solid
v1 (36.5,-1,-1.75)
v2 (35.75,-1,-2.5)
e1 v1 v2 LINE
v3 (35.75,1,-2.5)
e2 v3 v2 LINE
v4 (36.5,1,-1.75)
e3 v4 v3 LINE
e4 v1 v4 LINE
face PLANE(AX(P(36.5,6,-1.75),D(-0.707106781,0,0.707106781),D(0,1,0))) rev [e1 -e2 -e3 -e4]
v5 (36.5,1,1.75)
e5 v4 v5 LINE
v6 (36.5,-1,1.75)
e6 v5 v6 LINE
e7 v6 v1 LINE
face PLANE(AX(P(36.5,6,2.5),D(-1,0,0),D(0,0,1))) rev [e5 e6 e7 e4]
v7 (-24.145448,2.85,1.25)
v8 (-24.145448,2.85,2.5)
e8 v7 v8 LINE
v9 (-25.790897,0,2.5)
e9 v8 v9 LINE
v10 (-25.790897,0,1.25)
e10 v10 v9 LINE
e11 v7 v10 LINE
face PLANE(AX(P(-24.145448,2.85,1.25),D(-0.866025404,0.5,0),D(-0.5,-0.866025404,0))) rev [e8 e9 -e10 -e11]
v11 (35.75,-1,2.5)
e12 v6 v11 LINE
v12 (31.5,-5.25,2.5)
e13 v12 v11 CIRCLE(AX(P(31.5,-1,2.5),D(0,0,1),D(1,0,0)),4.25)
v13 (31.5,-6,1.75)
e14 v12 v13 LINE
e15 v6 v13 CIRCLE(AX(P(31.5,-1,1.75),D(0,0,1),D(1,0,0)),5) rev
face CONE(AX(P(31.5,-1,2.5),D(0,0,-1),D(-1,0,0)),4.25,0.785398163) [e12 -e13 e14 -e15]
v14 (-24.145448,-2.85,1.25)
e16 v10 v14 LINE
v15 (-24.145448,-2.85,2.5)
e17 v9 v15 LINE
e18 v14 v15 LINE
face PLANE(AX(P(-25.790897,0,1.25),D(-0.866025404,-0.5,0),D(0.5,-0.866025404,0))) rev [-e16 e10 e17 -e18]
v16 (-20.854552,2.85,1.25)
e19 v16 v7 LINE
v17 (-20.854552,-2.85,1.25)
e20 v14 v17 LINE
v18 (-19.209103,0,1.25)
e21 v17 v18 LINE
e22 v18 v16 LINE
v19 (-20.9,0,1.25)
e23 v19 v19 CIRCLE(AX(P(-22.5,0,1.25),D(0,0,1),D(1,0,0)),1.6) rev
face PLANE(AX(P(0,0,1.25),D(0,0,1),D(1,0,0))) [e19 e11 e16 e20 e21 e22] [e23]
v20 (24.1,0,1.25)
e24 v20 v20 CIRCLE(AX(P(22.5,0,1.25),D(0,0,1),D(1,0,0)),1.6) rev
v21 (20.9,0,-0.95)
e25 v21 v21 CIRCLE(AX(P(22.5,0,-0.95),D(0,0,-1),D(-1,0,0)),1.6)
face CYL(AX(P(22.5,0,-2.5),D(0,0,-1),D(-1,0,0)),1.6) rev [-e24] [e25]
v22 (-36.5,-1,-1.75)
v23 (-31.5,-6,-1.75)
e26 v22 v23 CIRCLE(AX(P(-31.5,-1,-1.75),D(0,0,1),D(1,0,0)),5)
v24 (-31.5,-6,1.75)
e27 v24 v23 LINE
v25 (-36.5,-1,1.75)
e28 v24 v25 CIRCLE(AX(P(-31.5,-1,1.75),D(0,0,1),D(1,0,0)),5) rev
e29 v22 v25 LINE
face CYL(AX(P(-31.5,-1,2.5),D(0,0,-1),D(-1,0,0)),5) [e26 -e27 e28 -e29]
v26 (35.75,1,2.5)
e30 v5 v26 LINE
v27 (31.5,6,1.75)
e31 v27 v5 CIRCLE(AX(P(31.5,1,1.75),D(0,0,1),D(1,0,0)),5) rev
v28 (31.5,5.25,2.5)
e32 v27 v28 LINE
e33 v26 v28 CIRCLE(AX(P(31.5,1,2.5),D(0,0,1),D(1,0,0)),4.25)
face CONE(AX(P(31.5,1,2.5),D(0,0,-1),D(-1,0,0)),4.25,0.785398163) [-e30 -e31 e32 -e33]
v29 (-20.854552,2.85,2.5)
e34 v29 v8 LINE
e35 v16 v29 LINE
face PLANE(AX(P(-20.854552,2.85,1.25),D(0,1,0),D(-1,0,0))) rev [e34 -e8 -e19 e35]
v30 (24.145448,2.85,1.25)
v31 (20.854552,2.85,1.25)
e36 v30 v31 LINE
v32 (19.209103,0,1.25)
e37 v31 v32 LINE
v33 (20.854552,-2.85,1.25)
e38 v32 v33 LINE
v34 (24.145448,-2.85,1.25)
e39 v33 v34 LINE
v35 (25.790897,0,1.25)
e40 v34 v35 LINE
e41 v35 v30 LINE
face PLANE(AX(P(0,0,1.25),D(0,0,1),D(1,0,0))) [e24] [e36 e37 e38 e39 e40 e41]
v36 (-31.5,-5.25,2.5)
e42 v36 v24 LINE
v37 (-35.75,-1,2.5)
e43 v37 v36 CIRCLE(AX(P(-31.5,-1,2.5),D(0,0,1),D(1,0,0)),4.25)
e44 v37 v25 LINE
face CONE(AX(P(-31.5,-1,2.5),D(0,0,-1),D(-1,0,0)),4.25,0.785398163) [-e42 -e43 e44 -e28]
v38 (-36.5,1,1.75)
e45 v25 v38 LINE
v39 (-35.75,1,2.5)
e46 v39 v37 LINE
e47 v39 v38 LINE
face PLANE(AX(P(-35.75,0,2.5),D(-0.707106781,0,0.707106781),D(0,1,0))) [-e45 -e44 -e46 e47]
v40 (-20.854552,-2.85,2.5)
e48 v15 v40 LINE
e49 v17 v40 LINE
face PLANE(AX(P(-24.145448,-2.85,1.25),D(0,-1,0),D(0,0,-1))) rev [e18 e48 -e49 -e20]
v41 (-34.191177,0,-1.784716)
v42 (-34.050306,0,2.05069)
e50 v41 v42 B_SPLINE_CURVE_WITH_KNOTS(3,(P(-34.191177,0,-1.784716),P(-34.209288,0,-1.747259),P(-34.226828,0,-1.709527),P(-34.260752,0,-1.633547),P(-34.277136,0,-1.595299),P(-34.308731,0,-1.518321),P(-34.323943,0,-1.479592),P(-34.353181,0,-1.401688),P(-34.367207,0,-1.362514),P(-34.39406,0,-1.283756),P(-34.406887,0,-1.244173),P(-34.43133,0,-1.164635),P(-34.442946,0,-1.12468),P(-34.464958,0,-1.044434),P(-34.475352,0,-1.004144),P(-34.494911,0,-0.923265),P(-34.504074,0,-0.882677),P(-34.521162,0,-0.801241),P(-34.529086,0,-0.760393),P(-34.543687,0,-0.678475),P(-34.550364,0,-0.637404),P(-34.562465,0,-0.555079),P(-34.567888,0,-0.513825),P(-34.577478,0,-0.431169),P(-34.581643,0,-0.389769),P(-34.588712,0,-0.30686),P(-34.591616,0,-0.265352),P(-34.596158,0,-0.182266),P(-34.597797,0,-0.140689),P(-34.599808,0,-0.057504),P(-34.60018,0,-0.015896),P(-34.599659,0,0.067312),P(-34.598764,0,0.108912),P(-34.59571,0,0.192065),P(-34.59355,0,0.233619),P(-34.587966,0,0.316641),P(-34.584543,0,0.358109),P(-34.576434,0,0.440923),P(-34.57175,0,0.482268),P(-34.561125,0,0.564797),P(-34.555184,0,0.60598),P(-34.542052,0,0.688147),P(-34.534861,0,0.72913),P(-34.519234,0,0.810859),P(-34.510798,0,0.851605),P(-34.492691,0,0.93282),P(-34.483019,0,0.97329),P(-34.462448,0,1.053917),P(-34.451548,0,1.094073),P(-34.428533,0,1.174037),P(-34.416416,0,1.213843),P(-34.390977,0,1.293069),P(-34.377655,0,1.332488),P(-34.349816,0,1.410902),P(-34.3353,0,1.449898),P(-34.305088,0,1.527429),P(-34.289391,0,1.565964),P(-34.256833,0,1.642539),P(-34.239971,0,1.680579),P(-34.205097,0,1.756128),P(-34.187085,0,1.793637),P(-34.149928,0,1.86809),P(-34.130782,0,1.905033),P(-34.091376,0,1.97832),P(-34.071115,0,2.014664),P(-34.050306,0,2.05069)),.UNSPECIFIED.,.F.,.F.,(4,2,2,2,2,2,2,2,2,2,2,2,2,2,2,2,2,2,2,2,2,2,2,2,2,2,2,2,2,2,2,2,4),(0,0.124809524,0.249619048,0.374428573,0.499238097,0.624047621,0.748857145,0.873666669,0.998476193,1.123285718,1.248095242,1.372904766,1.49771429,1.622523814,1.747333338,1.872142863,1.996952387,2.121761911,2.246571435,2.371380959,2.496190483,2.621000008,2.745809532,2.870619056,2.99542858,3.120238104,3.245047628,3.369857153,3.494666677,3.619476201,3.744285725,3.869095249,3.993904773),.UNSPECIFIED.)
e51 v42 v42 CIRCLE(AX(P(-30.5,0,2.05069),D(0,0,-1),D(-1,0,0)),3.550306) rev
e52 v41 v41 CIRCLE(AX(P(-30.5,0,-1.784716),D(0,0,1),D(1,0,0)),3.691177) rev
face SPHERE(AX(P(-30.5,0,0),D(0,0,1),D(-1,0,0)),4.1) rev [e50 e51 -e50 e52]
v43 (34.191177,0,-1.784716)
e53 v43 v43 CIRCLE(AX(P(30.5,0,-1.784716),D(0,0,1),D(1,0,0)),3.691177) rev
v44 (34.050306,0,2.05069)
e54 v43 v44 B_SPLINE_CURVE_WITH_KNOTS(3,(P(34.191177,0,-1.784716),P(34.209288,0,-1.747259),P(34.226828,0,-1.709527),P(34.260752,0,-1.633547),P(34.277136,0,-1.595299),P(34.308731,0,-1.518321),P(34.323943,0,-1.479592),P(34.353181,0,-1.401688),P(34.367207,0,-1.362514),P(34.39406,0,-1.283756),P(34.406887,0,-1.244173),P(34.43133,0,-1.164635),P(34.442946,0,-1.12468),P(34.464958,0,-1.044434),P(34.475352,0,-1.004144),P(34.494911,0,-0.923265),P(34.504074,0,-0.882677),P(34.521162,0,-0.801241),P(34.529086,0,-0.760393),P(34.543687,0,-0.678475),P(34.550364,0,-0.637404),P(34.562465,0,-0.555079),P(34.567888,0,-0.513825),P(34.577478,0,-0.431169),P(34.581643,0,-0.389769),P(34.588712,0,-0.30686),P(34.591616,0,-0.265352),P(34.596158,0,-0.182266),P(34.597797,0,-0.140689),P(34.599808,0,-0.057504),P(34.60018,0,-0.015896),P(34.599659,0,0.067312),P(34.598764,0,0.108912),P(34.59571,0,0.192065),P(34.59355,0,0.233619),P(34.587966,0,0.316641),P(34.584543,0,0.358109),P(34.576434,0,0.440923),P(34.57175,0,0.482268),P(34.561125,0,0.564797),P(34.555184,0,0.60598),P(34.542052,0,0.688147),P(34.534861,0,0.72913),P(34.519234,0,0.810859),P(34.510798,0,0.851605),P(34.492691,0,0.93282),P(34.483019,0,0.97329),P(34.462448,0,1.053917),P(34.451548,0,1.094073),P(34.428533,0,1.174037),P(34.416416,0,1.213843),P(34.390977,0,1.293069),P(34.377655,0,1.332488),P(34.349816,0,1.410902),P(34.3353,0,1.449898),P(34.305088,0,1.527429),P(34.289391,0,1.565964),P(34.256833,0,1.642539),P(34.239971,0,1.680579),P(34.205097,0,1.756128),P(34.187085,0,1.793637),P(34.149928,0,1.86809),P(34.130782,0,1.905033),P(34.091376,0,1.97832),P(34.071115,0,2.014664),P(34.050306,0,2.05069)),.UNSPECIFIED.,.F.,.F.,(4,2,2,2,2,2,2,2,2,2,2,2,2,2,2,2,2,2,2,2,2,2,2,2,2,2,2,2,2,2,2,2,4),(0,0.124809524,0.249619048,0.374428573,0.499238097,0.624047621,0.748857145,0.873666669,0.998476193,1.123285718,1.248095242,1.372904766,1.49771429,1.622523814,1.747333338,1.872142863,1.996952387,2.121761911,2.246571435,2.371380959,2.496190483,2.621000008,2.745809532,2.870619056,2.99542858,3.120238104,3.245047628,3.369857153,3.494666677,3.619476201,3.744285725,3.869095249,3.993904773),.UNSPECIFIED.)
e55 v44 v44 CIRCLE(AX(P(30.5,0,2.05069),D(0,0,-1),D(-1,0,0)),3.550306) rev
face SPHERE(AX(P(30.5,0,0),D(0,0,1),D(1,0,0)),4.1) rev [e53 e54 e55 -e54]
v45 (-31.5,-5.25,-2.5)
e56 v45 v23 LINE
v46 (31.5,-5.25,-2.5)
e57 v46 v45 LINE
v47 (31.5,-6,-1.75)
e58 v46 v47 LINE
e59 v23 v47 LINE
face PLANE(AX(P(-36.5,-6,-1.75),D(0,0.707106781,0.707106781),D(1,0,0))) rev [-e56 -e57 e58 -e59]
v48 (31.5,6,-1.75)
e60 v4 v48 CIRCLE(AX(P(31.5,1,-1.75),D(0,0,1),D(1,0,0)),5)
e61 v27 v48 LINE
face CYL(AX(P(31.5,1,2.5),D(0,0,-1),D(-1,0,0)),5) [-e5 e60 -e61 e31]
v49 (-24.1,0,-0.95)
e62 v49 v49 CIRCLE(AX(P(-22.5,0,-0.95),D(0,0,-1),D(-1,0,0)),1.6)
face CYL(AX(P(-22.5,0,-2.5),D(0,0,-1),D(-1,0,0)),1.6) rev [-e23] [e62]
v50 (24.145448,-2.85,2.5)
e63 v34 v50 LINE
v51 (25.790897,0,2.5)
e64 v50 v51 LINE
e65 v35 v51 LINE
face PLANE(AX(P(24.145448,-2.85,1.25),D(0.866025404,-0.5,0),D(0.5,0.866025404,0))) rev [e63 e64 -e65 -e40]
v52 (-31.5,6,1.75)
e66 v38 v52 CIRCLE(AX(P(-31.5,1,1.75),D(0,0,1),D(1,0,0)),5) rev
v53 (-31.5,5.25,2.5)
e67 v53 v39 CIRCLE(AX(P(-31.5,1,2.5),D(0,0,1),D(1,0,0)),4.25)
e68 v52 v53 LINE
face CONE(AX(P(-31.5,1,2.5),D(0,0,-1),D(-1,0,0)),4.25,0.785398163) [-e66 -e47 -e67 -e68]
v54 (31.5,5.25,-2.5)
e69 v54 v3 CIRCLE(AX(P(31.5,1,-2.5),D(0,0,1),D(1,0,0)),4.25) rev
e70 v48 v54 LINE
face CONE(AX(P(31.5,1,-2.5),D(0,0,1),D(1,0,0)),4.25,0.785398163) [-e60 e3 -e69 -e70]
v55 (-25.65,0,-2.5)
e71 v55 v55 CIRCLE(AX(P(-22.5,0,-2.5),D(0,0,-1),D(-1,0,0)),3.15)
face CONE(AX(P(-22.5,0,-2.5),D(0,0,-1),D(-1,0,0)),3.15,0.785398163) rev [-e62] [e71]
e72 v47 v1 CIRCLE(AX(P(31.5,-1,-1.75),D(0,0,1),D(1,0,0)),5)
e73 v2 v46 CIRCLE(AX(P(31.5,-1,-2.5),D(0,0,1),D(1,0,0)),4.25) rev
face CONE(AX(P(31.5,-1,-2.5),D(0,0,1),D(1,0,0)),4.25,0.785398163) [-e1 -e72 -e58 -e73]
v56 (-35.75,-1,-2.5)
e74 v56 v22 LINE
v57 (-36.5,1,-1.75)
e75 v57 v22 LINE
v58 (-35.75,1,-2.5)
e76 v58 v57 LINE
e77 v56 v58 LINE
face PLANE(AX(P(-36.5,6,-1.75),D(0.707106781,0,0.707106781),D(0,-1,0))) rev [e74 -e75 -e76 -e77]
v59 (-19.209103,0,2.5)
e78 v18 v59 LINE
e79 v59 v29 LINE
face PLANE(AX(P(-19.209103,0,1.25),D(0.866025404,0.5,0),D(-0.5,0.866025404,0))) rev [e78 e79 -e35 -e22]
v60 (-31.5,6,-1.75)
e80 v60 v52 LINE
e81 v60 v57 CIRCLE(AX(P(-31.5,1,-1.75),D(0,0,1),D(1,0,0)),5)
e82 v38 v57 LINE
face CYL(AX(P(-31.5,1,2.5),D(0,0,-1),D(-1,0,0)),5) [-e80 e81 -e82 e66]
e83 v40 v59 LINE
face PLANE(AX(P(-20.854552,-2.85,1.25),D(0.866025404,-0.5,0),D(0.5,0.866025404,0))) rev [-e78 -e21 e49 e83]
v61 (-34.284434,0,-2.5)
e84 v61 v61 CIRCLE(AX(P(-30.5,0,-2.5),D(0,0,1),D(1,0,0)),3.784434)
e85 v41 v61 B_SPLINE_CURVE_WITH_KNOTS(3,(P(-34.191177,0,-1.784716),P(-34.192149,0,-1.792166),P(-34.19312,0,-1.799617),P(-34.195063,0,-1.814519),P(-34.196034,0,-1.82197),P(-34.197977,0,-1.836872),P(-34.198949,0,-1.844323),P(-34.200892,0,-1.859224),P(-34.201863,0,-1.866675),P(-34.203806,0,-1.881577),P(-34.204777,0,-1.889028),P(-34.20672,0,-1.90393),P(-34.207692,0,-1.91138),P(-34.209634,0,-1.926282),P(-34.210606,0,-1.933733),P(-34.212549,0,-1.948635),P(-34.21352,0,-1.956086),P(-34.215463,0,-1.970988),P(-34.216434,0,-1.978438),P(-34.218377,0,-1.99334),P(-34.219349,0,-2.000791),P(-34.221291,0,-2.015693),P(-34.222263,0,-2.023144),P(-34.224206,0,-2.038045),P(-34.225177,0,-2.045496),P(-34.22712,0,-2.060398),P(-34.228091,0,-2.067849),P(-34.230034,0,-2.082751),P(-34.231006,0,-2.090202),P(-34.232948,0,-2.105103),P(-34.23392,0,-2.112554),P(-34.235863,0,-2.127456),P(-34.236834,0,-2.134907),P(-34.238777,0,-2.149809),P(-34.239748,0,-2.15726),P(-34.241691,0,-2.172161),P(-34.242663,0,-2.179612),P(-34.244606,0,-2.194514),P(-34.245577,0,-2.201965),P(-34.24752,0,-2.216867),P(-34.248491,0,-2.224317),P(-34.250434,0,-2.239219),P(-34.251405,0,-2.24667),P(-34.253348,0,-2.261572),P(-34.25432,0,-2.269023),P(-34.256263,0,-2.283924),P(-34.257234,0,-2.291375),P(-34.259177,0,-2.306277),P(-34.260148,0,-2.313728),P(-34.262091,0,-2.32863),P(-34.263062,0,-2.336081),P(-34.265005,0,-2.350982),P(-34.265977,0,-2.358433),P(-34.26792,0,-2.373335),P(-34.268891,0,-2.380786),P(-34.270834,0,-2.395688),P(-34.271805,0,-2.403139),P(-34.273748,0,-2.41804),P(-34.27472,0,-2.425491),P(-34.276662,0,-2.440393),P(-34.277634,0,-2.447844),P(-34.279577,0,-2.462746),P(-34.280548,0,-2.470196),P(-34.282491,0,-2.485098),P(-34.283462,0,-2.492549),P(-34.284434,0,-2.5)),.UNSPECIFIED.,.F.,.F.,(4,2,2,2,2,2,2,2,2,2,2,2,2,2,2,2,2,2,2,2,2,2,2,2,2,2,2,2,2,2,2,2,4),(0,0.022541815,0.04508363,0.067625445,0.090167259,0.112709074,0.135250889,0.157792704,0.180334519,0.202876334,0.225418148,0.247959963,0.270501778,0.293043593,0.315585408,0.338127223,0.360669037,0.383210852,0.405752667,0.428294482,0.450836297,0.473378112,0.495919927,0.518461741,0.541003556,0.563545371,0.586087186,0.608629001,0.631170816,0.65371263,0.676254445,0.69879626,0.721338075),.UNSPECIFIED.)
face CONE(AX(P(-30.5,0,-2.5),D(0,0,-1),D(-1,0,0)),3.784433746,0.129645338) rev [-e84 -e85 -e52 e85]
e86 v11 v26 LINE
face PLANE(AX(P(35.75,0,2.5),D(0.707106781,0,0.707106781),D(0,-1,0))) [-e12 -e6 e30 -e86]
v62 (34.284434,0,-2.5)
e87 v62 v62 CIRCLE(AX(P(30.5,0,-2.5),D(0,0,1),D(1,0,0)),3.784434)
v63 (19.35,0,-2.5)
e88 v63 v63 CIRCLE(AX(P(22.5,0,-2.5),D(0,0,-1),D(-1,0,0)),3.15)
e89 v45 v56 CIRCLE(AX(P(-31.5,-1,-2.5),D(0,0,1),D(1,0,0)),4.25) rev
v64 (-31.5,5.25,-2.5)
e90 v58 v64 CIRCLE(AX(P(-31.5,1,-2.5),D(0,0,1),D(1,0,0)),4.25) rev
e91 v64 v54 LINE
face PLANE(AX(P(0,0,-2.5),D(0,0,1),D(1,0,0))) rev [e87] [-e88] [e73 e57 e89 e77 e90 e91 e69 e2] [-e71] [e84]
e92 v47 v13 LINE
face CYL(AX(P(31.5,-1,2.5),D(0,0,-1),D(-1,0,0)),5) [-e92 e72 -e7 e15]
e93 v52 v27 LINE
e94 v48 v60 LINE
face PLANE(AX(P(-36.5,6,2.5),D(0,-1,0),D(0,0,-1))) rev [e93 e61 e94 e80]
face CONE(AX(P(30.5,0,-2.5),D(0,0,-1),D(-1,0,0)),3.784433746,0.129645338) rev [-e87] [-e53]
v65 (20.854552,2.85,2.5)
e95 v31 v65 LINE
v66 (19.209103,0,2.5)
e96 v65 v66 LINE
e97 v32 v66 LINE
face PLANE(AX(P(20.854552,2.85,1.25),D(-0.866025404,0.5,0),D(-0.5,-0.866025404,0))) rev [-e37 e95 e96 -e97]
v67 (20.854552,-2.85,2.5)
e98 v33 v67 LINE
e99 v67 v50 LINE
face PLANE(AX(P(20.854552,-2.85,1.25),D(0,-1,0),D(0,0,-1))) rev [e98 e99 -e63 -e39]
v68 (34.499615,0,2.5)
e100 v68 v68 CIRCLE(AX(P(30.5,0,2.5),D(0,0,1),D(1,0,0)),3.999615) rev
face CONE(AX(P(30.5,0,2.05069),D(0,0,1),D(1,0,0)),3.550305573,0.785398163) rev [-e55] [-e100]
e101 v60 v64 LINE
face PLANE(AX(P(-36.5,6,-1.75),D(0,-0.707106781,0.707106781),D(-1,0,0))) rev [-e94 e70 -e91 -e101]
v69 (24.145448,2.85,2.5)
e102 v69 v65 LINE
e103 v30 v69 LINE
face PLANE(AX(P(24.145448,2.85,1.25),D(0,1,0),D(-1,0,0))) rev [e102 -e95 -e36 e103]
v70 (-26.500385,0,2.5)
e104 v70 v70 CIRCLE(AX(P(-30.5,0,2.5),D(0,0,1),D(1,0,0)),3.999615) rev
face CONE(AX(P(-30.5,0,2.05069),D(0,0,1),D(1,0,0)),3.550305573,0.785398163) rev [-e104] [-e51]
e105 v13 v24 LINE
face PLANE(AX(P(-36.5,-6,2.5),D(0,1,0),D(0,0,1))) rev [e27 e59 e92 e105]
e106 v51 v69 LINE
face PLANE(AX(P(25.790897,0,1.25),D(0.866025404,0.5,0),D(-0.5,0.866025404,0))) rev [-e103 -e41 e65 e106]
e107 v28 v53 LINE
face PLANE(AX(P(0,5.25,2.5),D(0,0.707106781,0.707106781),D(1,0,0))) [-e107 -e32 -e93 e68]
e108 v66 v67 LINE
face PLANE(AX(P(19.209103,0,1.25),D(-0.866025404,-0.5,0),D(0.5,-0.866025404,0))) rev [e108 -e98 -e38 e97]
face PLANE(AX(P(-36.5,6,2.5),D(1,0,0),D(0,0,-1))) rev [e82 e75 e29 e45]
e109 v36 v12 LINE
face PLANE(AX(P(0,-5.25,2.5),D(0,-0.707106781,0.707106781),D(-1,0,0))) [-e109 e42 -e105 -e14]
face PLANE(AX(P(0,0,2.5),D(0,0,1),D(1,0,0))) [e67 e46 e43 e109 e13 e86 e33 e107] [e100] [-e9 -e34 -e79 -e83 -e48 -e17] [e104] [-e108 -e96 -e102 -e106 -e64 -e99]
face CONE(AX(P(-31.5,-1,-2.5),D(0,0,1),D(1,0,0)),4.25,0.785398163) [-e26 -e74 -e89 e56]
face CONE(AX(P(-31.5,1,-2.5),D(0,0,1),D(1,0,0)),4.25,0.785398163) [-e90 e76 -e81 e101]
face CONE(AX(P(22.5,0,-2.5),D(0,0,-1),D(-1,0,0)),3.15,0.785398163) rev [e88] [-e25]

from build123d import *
from build123d.topology import SkipClean

# Parameters (mm, degrees)
SKETCH1_W                                           = 73
SKETCH1_H                                           = 12
SKETCH1_R                                           = 2.5
BOSS_EXTRUDE1_DEPTH                                 = 2.5
FILLET1_R                                           = 5
CHAMFER1_SIZE                                       = 0.75
CHAMFER1_SIZE_2                                     = 0.534818385
CSK_FOR_M3_COUNTERSUNK_FLAT_HEAD_SCREW1_D           = 3.2
CSK_FOR_M3_COUNTERSUNK_FLAT_HEAD_SCREW1_CSINK_D     = 6.3
CSK_FOR_M3_COUNTERSUNK_FLAT_HEAD_SCREW1_CSINK_ANGLE = 90
CUT_EXTRUDE1_DEPTH                                  = 1.25


with BuildPart() as part:
    # Sketch1 → Boss-Extrude1 (new, symmetric)
    with BuildSketch(Plane.XY):
        Rectangle(SKETCH1_W, SKETCH1_H)
        with Locations((-30.5, 0)):
            Circle(SKETCH1_R, mode=Mode.SUBTRACT)
        with Locations((30.5, 0)):
            Circle(SKETCH1_R, mode=Mode.SUBTRACT)
    extrude(amount=BOSS_EXTRUDE1_DEPTH, both=True)

    # Sketch2 → Cut-Revolve1 (revolve, cut)
    with SkipClean():  # the faces are left unmerged after this step: merging them gives an invalid solid
        with BuildSketch(Plane(origin=(0, 0, 0), x_dir=(1, 0, 0), z_dir=(0, 1, 0)), mode=Mode.PRIVATE) as cut_revolve1_sk:
            with BuildLine():
                ThreePointArc((-30.5, 4.1), (-34.6, 0), (-30.5, -4.1))
                Line((-30.5, -4.1), (-30.5, 4.1))
            make_face()
            with BuildLine():
                Line((-30.5, 4.1), (-30.5, -4.1))
                ThreePointArc((-30.5, -4.1), (-27.600862197, -2.899137803), (-26.4, 0))
                ThreePointArc((-26.4, 0), (-27.600862197, 2.899137803), (-30.5, 4.1))
            make_face()
        cut_revolve1 = revolve(cut_revolve1_sk.sketch.rotate(Axis((-30.5, 0, 14.750329737), (0, 0, -1)), 180), axis=Axis((-30.5, 0, 14.750329737), (0, 0, -1)), mode=Mode.SUBTRACT)
    add(part.part.scale(1), mode=Mode.REPLACE)  # the faces are merged on a copy

    # Mirror1: Cut-Revolve1 across plane
    add(cut_revolve1.mirror(Plane(origin=(0, 0, 0), x_dir=(0, 0, 1), z_dir=(1, 0, 0))), mode=Mode.SUBTRACT)

    # Fillet1
    fillet1_edges = [part.edges().sort_by_distance(p)[0] for p in [
        (36.5, -6, 0),
        (-36.5, -6, 0),
        (-36.5, 6, 0),
        (36.5, 6, 0),
    ]]
    fillet(fillet1_edges, radius=FILLET1_R)

    # Chamfer1
    # the kernel refuses this chamfer: 0.75, 0.534818385 mm, written as the material it takes off along each edge
    with BuildSketch(Plane(origin=(-30.5, 0, 2.5), x_dir=(1, 0, 0), z_dir=(0, -1, 0))) as chamfer1_piece_1:
        with BuildLine():
            Line((3.249615362 + CHAMFER1_SIZE, 0), (3.550305573, -0.449309789))
            ThreePointArc((3.550305573, -0.449309789), (3.409004663, -0.222130994), (3.249615362, 0))
            Line((3.249615362, 0), (3.249615362 + CHAMFER1_SIZE, 0))
        make_face()
    revolve(axis=Axis((-30.5, 0, 2.5), (0, 0, 1)), mode=Mode.SUBTRACT)
    with BuildSketch(Plane(origin=(30.5, 0, 2.5), x_dir=(-1, 0, 0), z_dir=(0, 1, 0))) as chamfer1_piece_2:
        with BuildLine():
            Line((3.249615362 + CHAMFER1_SIZE, 0), (3.550305573, -0.449309789))
            ThreePointArc((3.550305573, -0.449309789), (3.409004663, -0.222130994), (3.249615362, 0))
            Line((3.249615362, 0), (3.249615362 + CHAMFER1_SIZE, 0))
        make_face()
    revolve(axis=Axis((30.5, 0, 2.5), (0, 0, 1)), mode=Mode.SUBTRACT)
    with BuildSketch(Plane(origin=(-30.5, 0, -2.5), x_dir=(1, 0, 0), z_dir=(0, -1, 0))) as chamfer1_piece_3:
        with BuildLine():
            Line((3.249615362 + CHAMFER1_SIZE_2, 0), (3.691177382, 0.715284467))
            ThreePointArc((3.691177382, 0.715284467), (3.494921898, 0.356283384), (3.249615362, 0))
            Line((3.249615362, 0), (3.249615362 + CHAMFER1_SIZE_2, 0))
        make_face()
    revolve(axis=Axis((-30.5, 0, -2.5), (0, 0, 1)), mode=Mode.SUBTRACT)
    with BuildSketch(Plane(origin=(30.5, 0, -2.5), x_dir=(-1, 0, 0), z_dir=(0, 1, 0))) as chamfer1_piece_4:
        with BuildLine():
            Line((3.249615362 + CHAMFER1_SIZE_2, 0), (3.691177382, 0.715284467))
            ThreePointArc((3.691177382, 0.715284467), (3.494921898, 0.356283384), (3.249615362, 0))
            Line((3.249615362, 0), (3.249615362 + CHAMFER1_SIZE_2, 0))
        make_face()
    revolve(axis=Axis((30.5, 0, -2.5), (0, 0, 1)), mode=Mode.SUBTRACT)
    with BuildSketch(Plane(origin=(-31.5, 6, -2.5), x_dir=(0, 0, 1), z_dir=(1, 0, 0)), Plane(origin=(31.5, -6, 2.5), x_dir=(0, 1, 0), z_dir=(-1, 0, 0))) as chamfer1_piece_5:
        Polygon((CHAMFER1_SIZE, 0), (0, CHAMFER1_SIZE), (0, 0), align=None)
    extrude(amount=63, mode=Mode.SUBTRACT)
    with BuildSketch(Plane(origin=(-31.5, 6, 2.5), x_dir=(0, 0, -1), z_dir=(1, 0, 0)), Plane(origin=(31.5, -6, -2.5), x_dir=(0, 1, 0), z_dir=(-1, 0, 0))) as chamfer1_piece_6:
        Polygon((CHAMFER1_SIZE, 0), (0, -CHAMFER1_SIZE), (0, 0), align=None)
    extrude(amount=63, mode=Mode.SUBTRACT)
    with BuildSketch(Plane(origin=(36.5, 1, -2.5), x_dir=(-1, 0, 0), z_dir=(0, -1, 0)), Plane(origin=(-36.5, -1, -2.5), x_dir=(1, 0, 0), z_dir=(0, 1, 0))) as chamfer1_piece_7:
        Polygon((CHAMFER1_SIZE, 0), (0, -CHAMFER1_SIZE), (0, 0), align=None)
    extrude(amount=2, mode=Mode.SUBTRACT)
    with BuildSketch(Plane(origin=(-31.5, -1, -2.5), x_dir=(-1, 0, 0), z_dir=(0, 1, 0))) as chamfer1_piece_8:
        Polygon((5 - CHAMFER1_SIZE, 0), (5, CHAMFER1_SIZE), (5, 0), align=None)
    revolve(axis=Axis((-31.5, -1, -2.5), (0, 0, 1)), revolution_arc=90, mode=Mode.SUBTRACT)
    with BuildSketch(Plane(origin=(-31.5, 1, -2.5), x_dir=(0, 1, 0), z_dir=(1, 0, 0))) as chamfer1_piece_9:
        Polygon((5 - CHAMFER1_SIZE, 0), (5, CHAMFER1_SIZE), (5, 0), align=None)
    revolve(axis=Axis((-31.5, 1, -2.5), (0, 0, 1)), revolution_arc=90, mode=Mode.SUBTRACT)
    with BuildSketch(Plane(origin=(31.5, -1, -2.5), x_dir=(1, 0, 0), z_dir=(0, 1, 0))) as chamfer1_piece_10:
        Polygon((5 - CHAMFER1_SIZE, 0), (5, -CHAMFER1_SIZE), (5, 0), align=None)
    revolve(axis=Axis((31.5, -1, -2.5), (0, 0, -1)), revolution_arc=90, mode=Mode.SUBTRACT)
    with BuildSketch(Plane(origin=(31.5, 1, -2.5), x_dir=(0, 1, 0), z_dir=(-1, 0, 0))) as chamfer1_piece_11:
        Polygon((5 - CHAMFER1_SIZE, 0), (5, -CHAMFER1_SIZE), (5, 0), align=None)
    revolve(axis=Axis((31.5, 1, -2.5), (0, 0, -1)), revolution_arc=90, mode=Mode.SUBTRACT)
    with BuildSketch(Plane(origin=(36.5, 1, 2.5), x_dir=(-1, 0, 0), z_dir=(0, -1, 0)), Plane(origin=(-36.5, -1, 2.5), x_dir=(1, 0, 0), z_dir=(0, 1, 0))) as chamfer1_piece_12:
        Polygon((CHAMFER1_SIZE, 0), (0, CHAMFER1_SIZE), (0, 0), align=None)
    extrude(amount=2, mode=Mode.SUBTRACT)
    with BuildSketch(Plane(origin=(-31.5, -1, 2.5), x_dir=(-1, 0, 0), z_dir=(0, 1, 0))) as chamfer1_piece_13:
        Polygon((5 - CHAMFER1_SIZE, 0), (5, -CHAMFER1_SIZE), (5, 0), align=None)
    revolve(axis=Axis((-31.5, -1, 2.5), (0, 0, 1)), revolution_arc=90, mode=Mode.SUBTRACT)
    with BuildSketch(Plane(origin=(-31.5, 1, 2.5), x_dir=(0, 1, 0), z_dir=(1, 0, 0))) as chamfer1_piece_14:
        Polygon((5, -CHAMFER1_SIZE), (5 - CHAMFER1_SIZE, 0), (5, 0), align=None)
    revolve(axis=Axis((-31.5, 1, 2.5), (0, 0, 1)), revolution_arc=90, mode=Mode.SUBTRACT)
    with BuildSketch(Plane(origin=(31.5, -1, 2.5), x_dir=(1, 0, 0), z_dir=(0, 1, 0))) as chamfer1_piece_15:
        Polygon((5 - CHAMFER1_SIZE, 0), (5, CHAMFER1_SIZE), (5, 0), align=None)
    revolve(axis=Axis((31.5, -1, 2.5), (0, 0, -1)), revolution_arc=90, mode=Mode.SUBTRACT)
    with BuildSketch(Plane(origin=(31.5, 1, 2.5), x_dir=(0, 1, 0), z_dir=(-1, 0, 0))) as chamfer1_piece_16:
        Polygon((5, CHAMFER1_SIZE), (5 - CHAMFER1_SIZE, 0), (5, 0), align=None)
    revolve(axis=Axis((31.5, 1, 2.5), (0, 0, -1)), revolution_arc=90, mode=Mode.SUBTRACT)

    # CSK for M3 Countersunk Flat Head Screw1 (through all)
    with Locations(Plane(origin=(0, 0, -2.5), x_dir=(-1, 0, 0), z_dir=(0, 0, -1))):
        with Locations((-22.5, 0), (22.5, 0)):
            CounterSinkHole(CSK_FOR_M3_COUNTERSUNK_FLAT_HEAD_SCREW1_D / 2, CSK_FOR_M3_COUNTERSUNK_FLAT_HEAD_SCREW1_CSINK_D / 2, counter_sink_angle=CSK_FOR_M3_COUNTERSUNK_FLAT_HEAD_SCREW1_CSINK_ANGLE)

    # Sketch6 → Cut-Extrude1 (cut)
    with BuildSketch(Plane.XY.offset(2.5)):
        Polygon((-19.209103466, 0), (-20.854551733, 2.85), (-24.145448267, 2.85), (-25.790896534, 0), (-24.145448267, -2.85), (-20.854551733, -2.85), align=None)
        Polygon((19.209103466, 0), (20.854551733, -2.85), (24.145448267, -2.85), (25.790896534, 0), (24.145448267, 2.85), (20.854551733, 2.85), align=None)
    extrude(amount=-CUT_EXTRUDE1_DEPTH, mode=Mode.SUBTRACT)


solid = part.part
